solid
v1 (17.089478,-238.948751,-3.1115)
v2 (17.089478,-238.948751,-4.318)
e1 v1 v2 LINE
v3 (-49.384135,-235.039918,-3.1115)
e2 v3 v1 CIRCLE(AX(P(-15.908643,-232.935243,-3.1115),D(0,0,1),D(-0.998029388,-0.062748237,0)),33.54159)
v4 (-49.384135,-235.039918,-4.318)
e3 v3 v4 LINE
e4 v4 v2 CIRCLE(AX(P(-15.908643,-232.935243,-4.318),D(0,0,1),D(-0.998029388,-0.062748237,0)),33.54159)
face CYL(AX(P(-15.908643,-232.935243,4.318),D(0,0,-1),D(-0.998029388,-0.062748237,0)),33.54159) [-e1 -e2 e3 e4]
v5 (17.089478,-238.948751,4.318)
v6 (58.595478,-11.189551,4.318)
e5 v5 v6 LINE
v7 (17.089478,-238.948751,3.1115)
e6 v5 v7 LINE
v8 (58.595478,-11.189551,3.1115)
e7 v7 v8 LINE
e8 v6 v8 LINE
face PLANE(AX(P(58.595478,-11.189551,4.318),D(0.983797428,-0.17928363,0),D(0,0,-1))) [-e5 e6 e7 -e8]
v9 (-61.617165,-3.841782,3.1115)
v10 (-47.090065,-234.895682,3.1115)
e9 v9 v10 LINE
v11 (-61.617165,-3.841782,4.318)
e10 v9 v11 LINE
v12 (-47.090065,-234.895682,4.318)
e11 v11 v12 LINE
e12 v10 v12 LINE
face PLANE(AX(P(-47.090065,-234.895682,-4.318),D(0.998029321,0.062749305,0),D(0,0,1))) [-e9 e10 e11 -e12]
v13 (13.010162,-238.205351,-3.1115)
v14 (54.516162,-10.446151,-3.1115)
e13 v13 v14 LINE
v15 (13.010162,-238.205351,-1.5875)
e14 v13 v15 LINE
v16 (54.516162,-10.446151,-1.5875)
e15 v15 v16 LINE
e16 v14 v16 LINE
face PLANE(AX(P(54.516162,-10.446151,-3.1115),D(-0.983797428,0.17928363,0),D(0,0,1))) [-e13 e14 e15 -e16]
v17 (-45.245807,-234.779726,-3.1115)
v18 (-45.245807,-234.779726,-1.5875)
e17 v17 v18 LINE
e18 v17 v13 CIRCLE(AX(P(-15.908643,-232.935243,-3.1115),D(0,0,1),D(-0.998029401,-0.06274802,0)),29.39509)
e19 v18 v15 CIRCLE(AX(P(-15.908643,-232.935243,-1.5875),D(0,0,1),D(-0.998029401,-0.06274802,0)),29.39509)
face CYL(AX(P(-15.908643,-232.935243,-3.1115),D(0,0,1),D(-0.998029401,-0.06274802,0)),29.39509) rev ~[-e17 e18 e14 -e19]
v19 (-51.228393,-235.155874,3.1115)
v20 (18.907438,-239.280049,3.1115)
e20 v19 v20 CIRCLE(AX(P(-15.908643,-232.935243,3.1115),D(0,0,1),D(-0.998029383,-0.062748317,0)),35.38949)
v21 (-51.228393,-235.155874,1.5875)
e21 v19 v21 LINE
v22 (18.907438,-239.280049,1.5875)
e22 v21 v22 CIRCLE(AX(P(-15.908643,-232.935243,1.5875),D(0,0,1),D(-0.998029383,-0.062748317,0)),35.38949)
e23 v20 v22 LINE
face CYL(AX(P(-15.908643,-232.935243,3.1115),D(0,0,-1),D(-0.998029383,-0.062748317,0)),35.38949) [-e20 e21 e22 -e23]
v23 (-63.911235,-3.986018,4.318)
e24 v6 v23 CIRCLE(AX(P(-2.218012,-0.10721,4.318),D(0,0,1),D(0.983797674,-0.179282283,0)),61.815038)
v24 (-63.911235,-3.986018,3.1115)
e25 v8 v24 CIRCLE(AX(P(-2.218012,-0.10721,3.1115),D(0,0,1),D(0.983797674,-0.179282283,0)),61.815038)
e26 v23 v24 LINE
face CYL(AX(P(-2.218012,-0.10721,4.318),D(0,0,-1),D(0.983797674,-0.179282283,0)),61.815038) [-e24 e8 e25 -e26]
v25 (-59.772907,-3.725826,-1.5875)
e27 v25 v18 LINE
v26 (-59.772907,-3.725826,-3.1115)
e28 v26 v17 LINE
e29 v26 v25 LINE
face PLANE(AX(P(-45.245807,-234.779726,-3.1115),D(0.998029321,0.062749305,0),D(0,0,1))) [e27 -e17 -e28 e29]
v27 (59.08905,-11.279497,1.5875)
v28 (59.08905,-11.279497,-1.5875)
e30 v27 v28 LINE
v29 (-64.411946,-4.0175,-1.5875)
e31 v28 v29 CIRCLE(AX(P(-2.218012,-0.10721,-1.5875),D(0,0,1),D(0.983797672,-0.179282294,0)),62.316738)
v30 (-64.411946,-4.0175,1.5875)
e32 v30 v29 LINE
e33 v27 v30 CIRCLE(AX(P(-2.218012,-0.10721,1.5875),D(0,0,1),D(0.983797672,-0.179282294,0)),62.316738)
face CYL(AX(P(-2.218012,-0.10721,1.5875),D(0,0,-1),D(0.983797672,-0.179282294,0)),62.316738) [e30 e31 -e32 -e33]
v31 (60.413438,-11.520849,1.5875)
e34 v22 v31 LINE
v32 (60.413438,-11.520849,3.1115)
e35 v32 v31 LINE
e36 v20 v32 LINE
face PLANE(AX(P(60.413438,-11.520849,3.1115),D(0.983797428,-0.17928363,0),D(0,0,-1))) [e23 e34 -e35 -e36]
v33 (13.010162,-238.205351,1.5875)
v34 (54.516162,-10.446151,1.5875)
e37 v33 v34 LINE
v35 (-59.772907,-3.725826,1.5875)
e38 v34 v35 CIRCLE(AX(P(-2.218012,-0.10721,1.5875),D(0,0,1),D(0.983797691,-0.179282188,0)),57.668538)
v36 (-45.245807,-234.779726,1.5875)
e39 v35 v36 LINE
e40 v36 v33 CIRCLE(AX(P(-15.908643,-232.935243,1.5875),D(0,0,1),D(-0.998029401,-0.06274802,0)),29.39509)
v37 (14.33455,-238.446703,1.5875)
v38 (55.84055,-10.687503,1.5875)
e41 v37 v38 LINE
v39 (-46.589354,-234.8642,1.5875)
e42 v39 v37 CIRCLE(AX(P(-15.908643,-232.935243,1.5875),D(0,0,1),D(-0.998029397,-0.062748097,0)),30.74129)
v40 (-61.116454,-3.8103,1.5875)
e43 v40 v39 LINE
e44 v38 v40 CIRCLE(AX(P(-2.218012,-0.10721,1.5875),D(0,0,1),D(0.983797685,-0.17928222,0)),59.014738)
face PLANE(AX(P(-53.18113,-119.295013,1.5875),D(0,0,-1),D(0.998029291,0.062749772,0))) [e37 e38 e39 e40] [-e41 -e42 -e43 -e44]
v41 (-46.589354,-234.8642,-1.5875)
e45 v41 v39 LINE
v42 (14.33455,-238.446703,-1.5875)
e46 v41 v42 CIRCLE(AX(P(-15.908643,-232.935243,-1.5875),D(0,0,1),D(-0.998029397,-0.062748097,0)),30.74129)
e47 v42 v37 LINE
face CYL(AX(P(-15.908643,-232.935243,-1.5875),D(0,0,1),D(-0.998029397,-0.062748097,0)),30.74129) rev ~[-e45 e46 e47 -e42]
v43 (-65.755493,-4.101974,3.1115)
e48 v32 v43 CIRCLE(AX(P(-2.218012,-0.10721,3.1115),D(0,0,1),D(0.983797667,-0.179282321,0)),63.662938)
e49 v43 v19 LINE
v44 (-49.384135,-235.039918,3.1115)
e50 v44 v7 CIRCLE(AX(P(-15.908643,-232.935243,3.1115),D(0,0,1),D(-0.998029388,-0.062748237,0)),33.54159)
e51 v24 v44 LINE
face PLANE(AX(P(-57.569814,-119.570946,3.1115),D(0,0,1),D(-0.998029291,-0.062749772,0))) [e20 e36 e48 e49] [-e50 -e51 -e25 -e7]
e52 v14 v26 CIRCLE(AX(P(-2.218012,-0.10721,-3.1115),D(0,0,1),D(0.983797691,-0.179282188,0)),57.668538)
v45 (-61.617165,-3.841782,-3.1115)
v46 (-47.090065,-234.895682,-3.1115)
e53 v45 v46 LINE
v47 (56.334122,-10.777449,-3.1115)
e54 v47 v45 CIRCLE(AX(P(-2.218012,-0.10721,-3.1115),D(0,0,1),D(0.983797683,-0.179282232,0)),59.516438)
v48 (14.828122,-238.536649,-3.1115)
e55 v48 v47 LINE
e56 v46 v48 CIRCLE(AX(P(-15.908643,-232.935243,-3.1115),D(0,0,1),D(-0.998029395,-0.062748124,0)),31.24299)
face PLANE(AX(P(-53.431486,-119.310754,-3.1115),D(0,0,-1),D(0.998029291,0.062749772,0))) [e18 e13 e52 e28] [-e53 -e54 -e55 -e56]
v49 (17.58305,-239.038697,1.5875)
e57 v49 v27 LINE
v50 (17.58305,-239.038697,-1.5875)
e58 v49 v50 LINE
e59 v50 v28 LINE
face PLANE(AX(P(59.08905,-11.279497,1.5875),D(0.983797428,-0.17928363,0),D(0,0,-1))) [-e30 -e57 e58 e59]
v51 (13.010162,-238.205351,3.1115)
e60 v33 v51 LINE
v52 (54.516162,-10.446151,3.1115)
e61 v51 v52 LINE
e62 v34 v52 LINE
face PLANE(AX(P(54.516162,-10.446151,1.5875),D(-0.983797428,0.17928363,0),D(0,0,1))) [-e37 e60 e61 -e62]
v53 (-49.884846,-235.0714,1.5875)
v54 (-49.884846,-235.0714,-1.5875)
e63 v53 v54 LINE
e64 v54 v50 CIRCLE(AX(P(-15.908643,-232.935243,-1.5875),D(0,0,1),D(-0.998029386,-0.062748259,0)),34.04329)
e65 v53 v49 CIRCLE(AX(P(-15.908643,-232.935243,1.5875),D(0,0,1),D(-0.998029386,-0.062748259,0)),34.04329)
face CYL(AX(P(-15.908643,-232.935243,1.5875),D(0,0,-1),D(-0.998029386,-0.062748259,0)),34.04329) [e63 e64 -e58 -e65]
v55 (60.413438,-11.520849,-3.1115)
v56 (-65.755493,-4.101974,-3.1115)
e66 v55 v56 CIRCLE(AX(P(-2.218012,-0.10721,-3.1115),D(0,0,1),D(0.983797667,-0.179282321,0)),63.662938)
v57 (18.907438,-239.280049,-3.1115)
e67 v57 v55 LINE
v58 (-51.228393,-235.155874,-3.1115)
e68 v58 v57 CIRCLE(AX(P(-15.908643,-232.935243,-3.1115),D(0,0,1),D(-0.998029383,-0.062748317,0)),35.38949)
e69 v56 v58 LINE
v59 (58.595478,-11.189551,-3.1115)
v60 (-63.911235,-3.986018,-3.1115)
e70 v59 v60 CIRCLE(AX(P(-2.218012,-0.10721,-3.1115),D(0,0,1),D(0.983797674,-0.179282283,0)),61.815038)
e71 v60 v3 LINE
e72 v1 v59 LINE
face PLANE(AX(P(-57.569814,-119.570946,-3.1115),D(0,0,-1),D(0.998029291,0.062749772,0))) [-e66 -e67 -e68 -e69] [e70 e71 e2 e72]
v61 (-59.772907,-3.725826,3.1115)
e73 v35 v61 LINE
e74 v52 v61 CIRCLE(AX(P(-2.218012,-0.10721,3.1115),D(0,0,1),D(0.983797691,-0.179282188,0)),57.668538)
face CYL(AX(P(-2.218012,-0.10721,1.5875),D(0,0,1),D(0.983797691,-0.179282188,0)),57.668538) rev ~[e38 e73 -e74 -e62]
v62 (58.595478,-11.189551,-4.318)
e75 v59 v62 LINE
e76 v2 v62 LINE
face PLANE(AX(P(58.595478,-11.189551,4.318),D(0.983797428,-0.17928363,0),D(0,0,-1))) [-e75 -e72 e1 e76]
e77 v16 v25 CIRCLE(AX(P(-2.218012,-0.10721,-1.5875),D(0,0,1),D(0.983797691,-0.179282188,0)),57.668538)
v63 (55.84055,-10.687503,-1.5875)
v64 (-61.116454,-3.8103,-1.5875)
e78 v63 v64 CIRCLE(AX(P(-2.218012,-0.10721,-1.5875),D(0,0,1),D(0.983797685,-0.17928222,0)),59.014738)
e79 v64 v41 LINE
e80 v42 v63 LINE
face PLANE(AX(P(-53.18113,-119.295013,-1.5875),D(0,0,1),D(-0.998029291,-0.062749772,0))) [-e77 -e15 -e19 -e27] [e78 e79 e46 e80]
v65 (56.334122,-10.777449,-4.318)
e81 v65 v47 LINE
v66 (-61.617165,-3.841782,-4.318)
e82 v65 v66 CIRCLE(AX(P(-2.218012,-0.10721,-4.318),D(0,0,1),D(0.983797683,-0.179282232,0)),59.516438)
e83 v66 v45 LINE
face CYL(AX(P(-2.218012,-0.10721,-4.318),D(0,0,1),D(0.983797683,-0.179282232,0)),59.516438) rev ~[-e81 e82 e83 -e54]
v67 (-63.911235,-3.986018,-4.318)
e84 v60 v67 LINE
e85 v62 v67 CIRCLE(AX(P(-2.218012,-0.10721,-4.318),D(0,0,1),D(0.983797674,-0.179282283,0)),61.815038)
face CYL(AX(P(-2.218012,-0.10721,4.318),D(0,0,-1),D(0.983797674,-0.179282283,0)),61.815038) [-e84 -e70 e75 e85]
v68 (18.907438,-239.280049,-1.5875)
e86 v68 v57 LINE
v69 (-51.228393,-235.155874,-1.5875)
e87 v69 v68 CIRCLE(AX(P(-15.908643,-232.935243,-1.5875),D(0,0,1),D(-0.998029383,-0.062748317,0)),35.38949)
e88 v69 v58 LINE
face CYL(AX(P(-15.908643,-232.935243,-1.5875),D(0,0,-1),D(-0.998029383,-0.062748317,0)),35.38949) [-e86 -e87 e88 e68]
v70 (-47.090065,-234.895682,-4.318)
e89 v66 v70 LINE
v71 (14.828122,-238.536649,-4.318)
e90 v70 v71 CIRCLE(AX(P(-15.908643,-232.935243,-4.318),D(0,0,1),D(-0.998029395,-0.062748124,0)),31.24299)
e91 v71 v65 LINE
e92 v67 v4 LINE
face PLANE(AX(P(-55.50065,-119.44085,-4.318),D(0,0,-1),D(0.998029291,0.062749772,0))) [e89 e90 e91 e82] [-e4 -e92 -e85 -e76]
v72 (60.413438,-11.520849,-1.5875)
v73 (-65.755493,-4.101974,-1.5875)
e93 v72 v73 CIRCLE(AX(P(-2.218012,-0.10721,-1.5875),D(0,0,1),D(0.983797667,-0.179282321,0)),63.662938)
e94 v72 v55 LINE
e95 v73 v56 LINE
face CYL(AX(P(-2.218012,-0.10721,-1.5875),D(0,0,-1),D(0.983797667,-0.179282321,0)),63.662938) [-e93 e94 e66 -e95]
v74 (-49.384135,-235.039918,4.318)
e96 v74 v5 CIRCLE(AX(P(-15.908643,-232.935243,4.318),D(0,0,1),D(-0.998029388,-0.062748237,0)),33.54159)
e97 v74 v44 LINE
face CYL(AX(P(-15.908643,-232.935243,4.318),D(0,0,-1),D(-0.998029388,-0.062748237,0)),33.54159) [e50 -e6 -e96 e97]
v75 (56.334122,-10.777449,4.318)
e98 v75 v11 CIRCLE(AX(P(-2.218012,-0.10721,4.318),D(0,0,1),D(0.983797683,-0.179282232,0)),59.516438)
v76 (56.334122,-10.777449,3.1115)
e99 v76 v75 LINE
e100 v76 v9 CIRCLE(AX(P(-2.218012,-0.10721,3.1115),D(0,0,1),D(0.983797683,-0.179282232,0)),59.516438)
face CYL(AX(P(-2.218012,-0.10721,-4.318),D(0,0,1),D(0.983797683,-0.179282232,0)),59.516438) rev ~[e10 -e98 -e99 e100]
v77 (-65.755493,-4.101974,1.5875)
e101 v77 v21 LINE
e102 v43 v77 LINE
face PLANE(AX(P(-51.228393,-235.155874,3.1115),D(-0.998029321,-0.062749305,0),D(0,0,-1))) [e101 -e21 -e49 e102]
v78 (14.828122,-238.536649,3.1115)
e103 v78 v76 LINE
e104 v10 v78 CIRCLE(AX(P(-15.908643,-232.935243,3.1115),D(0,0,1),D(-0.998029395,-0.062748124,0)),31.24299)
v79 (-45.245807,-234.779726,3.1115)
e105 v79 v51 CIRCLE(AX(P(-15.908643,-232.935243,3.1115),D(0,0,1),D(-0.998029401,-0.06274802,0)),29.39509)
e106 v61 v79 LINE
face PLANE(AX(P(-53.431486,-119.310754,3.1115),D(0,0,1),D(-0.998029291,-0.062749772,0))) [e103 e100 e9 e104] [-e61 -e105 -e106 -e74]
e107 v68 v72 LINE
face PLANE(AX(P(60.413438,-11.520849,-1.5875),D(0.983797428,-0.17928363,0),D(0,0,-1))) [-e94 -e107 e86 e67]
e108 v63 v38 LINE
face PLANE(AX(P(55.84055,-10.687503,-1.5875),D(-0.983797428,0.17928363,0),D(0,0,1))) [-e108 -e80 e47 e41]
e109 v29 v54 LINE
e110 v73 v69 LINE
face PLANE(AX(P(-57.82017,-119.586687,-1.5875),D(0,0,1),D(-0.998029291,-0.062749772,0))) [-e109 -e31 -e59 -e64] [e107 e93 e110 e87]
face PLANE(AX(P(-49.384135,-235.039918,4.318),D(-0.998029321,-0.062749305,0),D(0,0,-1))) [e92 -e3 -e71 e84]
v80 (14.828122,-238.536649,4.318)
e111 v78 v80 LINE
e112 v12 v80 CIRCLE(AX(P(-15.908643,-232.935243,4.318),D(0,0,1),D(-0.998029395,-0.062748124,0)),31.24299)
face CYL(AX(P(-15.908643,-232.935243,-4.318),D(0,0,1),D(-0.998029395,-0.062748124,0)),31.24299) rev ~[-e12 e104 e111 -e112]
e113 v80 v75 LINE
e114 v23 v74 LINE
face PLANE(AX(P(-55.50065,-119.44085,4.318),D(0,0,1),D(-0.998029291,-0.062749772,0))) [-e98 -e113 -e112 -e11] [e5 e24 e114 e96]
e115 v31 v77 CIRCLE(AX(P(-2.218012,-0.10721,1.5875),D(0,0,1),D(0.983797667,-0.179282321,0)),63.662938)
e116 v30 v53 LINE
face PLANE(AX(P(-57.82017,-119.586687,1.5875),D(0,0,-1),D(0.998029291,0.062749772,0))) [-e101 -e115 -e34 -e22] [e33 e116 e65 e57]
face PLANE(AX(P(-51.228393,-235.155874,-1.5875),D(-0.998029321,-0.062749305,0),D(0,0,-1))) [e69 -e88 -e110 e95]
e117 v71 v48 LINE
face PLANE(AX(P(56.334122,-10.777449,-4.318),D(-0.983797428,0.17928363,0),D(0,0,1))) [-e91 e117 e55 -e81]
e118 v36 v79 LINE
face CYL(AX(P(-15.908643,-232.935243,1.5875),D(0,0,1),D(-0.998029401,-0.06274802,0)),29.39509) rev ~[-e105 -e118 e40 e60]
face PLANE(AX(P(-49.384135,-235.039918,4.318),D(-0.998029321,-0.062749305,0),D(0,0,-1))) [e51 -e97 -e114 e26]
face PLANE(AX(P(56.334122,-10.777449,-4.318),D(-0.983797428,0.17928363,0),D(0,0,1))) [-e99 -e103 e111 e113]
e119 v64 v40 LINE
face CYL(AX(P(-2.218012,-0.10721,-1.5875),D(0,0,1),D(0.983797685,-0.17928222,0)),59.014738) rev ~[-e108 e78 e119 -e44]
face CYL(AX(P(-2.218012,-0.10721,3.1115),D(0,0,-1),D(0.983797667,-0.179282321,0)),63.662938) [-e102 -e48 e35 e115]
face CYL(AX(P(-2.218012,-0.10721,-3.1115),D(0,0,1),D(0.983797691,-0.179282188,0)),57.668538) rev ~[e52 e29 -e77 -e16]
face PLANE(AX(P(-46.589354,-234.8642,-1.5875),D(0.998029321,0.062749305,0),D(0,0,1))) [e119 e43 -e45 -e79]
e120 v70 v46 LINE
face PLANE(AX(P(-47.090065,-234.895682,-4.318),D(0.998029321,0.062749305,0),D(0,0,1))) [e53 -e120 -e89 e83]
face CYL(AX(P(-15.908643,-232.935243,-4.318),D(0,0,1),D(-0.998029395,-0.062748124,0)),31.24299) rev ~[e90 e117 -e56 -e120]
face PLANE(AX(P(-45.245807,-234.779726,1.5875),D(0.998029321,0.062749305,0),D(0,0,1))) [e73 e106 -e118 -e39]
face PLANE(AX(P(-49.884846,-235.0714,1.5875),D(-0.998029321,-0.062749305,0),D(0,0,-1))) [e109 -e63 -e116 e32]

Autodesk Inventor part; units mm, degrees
ref_plane "Work Plane2" through (-15.9086, -232.9352, 0) normal (-1, 0, 0) x (0, 0, 1)
ref_plane "Work Plane3" through (-2.218, -0.1072, 0) normal (-0.027413, -0.9996242, 0) x (0, 0, 1)
sketch "Path" plane through (0, 0, 0) normal (0, 0, 1) x (1, 0, 0)
  arc A0 (-48.2371, -234.9678) -> (15.9588, -238.7427) centre (-15.9086, -232.9352) ccw
  arc A1 (57.4648, -10.9835) -> (-62.7642, -3.9139) centre (-2.218, -0.1072) ccw
  line L0 (57.4648, -10.9835) -> (15.9588, -238.7427)
  line L1 (-48.2371, -234.9678) -> (-62.7642, -3.9139)
  dimension "d31" = 5.9944
ref_plane "Section Plane" through (15.9588, -238.7427, 0) normal (0.1792836, 0.9837974, 0) x (0, 0, 1)
sketch "Section Sketch" plane through (15.9588, -238.7427, 0) normal (0.1792836, 0.9837974, 0) x (0, 0, 1)
  line L0 (-4.318, -1.1493) -> (4.318, -1.1493)
  line L1 (4.318, -1.1493) -> (4.318, 1.1493)
  line L2 (4.318, 1.1493) -> (-4.318, 1.1493)
  line L3 (-4.318, 1.1493) -> (-4.318, -1.1493)
  line L4 (-1.5875, -1.651) -> (1.5875, -1.651)
  line L5 (1.5875, -1.651) -> (1.5875, 1.651)
  line L6 (1.5875, 1.651) -> (-1.5875, 1.651)
  line L7 (-1.5875, 1.651) -> (-1.5875, -1.651)
  line L8 (-1.5875, 0) -> (1.5875, 0) construction
  line L9 (-3.1115, -2.9972) -> (-1.5875, -2.9972)
  line L10 (-1.5875, -2.9972) -> (-1.5875, 2.9972)
  line L11 (-1.5875, 2.9972) -> (-3.1115, 2.9972)
  line L12 (-3.1115, 2.9972) -> (-3.1115, -2.9972)
  line L13 (1.5875, -2.9972) -> (3.1115, -2.9972)
  line L14 (3.1115, -2.9972) -> (3.1115, 2.9972)
  line L15 (3.1115, 2.9972) -> (1.5875, 2.9972)
  line L16 (1.5875, 2.9972) -> (1.5875, -2.9972)
  line L17 (-4.318, 0) -> (4.318, 0) construction
  point P0 (0, 0)
  point P1 (0, 0)
  dimension "d21" = 2.2987
  dimension "d22" = 3.302
  dimension "d23" = 3.175
  dimension "d24" = 1.524
  dimension "d31" = 5.9944
  dimension "d32" = 8.636
sweep "Solid" add profiles "Section Sketch" path "Path"
pattern_of_one "Strand Pattern"
equation "\"d21\" = da_d2"
equation "\"d22\" = da_d1"
equation "\"d23\" = da_b1"
equation "\"d24\" = da_t1 + da_t2"
equation "\"d30\" = da_pt"
equation "\"da_p\" = 6.35"
equation "\"da_b1\" = 3.175"
equation "\"da_h2\" = 5.9944"
equation "\"da_h3\" = 5.207"
equation "\"da_d1\" = 3.302"
equation "\"da_d2\" = 2.2987"
equation "\"da_pt\" = 6.4008"
equation "\"da_b\" = 8.636"
equation "\"da_t1\" = 0.762"
equation "\"da_t2\" = 0.762"
properties part number "Roller Chain"
